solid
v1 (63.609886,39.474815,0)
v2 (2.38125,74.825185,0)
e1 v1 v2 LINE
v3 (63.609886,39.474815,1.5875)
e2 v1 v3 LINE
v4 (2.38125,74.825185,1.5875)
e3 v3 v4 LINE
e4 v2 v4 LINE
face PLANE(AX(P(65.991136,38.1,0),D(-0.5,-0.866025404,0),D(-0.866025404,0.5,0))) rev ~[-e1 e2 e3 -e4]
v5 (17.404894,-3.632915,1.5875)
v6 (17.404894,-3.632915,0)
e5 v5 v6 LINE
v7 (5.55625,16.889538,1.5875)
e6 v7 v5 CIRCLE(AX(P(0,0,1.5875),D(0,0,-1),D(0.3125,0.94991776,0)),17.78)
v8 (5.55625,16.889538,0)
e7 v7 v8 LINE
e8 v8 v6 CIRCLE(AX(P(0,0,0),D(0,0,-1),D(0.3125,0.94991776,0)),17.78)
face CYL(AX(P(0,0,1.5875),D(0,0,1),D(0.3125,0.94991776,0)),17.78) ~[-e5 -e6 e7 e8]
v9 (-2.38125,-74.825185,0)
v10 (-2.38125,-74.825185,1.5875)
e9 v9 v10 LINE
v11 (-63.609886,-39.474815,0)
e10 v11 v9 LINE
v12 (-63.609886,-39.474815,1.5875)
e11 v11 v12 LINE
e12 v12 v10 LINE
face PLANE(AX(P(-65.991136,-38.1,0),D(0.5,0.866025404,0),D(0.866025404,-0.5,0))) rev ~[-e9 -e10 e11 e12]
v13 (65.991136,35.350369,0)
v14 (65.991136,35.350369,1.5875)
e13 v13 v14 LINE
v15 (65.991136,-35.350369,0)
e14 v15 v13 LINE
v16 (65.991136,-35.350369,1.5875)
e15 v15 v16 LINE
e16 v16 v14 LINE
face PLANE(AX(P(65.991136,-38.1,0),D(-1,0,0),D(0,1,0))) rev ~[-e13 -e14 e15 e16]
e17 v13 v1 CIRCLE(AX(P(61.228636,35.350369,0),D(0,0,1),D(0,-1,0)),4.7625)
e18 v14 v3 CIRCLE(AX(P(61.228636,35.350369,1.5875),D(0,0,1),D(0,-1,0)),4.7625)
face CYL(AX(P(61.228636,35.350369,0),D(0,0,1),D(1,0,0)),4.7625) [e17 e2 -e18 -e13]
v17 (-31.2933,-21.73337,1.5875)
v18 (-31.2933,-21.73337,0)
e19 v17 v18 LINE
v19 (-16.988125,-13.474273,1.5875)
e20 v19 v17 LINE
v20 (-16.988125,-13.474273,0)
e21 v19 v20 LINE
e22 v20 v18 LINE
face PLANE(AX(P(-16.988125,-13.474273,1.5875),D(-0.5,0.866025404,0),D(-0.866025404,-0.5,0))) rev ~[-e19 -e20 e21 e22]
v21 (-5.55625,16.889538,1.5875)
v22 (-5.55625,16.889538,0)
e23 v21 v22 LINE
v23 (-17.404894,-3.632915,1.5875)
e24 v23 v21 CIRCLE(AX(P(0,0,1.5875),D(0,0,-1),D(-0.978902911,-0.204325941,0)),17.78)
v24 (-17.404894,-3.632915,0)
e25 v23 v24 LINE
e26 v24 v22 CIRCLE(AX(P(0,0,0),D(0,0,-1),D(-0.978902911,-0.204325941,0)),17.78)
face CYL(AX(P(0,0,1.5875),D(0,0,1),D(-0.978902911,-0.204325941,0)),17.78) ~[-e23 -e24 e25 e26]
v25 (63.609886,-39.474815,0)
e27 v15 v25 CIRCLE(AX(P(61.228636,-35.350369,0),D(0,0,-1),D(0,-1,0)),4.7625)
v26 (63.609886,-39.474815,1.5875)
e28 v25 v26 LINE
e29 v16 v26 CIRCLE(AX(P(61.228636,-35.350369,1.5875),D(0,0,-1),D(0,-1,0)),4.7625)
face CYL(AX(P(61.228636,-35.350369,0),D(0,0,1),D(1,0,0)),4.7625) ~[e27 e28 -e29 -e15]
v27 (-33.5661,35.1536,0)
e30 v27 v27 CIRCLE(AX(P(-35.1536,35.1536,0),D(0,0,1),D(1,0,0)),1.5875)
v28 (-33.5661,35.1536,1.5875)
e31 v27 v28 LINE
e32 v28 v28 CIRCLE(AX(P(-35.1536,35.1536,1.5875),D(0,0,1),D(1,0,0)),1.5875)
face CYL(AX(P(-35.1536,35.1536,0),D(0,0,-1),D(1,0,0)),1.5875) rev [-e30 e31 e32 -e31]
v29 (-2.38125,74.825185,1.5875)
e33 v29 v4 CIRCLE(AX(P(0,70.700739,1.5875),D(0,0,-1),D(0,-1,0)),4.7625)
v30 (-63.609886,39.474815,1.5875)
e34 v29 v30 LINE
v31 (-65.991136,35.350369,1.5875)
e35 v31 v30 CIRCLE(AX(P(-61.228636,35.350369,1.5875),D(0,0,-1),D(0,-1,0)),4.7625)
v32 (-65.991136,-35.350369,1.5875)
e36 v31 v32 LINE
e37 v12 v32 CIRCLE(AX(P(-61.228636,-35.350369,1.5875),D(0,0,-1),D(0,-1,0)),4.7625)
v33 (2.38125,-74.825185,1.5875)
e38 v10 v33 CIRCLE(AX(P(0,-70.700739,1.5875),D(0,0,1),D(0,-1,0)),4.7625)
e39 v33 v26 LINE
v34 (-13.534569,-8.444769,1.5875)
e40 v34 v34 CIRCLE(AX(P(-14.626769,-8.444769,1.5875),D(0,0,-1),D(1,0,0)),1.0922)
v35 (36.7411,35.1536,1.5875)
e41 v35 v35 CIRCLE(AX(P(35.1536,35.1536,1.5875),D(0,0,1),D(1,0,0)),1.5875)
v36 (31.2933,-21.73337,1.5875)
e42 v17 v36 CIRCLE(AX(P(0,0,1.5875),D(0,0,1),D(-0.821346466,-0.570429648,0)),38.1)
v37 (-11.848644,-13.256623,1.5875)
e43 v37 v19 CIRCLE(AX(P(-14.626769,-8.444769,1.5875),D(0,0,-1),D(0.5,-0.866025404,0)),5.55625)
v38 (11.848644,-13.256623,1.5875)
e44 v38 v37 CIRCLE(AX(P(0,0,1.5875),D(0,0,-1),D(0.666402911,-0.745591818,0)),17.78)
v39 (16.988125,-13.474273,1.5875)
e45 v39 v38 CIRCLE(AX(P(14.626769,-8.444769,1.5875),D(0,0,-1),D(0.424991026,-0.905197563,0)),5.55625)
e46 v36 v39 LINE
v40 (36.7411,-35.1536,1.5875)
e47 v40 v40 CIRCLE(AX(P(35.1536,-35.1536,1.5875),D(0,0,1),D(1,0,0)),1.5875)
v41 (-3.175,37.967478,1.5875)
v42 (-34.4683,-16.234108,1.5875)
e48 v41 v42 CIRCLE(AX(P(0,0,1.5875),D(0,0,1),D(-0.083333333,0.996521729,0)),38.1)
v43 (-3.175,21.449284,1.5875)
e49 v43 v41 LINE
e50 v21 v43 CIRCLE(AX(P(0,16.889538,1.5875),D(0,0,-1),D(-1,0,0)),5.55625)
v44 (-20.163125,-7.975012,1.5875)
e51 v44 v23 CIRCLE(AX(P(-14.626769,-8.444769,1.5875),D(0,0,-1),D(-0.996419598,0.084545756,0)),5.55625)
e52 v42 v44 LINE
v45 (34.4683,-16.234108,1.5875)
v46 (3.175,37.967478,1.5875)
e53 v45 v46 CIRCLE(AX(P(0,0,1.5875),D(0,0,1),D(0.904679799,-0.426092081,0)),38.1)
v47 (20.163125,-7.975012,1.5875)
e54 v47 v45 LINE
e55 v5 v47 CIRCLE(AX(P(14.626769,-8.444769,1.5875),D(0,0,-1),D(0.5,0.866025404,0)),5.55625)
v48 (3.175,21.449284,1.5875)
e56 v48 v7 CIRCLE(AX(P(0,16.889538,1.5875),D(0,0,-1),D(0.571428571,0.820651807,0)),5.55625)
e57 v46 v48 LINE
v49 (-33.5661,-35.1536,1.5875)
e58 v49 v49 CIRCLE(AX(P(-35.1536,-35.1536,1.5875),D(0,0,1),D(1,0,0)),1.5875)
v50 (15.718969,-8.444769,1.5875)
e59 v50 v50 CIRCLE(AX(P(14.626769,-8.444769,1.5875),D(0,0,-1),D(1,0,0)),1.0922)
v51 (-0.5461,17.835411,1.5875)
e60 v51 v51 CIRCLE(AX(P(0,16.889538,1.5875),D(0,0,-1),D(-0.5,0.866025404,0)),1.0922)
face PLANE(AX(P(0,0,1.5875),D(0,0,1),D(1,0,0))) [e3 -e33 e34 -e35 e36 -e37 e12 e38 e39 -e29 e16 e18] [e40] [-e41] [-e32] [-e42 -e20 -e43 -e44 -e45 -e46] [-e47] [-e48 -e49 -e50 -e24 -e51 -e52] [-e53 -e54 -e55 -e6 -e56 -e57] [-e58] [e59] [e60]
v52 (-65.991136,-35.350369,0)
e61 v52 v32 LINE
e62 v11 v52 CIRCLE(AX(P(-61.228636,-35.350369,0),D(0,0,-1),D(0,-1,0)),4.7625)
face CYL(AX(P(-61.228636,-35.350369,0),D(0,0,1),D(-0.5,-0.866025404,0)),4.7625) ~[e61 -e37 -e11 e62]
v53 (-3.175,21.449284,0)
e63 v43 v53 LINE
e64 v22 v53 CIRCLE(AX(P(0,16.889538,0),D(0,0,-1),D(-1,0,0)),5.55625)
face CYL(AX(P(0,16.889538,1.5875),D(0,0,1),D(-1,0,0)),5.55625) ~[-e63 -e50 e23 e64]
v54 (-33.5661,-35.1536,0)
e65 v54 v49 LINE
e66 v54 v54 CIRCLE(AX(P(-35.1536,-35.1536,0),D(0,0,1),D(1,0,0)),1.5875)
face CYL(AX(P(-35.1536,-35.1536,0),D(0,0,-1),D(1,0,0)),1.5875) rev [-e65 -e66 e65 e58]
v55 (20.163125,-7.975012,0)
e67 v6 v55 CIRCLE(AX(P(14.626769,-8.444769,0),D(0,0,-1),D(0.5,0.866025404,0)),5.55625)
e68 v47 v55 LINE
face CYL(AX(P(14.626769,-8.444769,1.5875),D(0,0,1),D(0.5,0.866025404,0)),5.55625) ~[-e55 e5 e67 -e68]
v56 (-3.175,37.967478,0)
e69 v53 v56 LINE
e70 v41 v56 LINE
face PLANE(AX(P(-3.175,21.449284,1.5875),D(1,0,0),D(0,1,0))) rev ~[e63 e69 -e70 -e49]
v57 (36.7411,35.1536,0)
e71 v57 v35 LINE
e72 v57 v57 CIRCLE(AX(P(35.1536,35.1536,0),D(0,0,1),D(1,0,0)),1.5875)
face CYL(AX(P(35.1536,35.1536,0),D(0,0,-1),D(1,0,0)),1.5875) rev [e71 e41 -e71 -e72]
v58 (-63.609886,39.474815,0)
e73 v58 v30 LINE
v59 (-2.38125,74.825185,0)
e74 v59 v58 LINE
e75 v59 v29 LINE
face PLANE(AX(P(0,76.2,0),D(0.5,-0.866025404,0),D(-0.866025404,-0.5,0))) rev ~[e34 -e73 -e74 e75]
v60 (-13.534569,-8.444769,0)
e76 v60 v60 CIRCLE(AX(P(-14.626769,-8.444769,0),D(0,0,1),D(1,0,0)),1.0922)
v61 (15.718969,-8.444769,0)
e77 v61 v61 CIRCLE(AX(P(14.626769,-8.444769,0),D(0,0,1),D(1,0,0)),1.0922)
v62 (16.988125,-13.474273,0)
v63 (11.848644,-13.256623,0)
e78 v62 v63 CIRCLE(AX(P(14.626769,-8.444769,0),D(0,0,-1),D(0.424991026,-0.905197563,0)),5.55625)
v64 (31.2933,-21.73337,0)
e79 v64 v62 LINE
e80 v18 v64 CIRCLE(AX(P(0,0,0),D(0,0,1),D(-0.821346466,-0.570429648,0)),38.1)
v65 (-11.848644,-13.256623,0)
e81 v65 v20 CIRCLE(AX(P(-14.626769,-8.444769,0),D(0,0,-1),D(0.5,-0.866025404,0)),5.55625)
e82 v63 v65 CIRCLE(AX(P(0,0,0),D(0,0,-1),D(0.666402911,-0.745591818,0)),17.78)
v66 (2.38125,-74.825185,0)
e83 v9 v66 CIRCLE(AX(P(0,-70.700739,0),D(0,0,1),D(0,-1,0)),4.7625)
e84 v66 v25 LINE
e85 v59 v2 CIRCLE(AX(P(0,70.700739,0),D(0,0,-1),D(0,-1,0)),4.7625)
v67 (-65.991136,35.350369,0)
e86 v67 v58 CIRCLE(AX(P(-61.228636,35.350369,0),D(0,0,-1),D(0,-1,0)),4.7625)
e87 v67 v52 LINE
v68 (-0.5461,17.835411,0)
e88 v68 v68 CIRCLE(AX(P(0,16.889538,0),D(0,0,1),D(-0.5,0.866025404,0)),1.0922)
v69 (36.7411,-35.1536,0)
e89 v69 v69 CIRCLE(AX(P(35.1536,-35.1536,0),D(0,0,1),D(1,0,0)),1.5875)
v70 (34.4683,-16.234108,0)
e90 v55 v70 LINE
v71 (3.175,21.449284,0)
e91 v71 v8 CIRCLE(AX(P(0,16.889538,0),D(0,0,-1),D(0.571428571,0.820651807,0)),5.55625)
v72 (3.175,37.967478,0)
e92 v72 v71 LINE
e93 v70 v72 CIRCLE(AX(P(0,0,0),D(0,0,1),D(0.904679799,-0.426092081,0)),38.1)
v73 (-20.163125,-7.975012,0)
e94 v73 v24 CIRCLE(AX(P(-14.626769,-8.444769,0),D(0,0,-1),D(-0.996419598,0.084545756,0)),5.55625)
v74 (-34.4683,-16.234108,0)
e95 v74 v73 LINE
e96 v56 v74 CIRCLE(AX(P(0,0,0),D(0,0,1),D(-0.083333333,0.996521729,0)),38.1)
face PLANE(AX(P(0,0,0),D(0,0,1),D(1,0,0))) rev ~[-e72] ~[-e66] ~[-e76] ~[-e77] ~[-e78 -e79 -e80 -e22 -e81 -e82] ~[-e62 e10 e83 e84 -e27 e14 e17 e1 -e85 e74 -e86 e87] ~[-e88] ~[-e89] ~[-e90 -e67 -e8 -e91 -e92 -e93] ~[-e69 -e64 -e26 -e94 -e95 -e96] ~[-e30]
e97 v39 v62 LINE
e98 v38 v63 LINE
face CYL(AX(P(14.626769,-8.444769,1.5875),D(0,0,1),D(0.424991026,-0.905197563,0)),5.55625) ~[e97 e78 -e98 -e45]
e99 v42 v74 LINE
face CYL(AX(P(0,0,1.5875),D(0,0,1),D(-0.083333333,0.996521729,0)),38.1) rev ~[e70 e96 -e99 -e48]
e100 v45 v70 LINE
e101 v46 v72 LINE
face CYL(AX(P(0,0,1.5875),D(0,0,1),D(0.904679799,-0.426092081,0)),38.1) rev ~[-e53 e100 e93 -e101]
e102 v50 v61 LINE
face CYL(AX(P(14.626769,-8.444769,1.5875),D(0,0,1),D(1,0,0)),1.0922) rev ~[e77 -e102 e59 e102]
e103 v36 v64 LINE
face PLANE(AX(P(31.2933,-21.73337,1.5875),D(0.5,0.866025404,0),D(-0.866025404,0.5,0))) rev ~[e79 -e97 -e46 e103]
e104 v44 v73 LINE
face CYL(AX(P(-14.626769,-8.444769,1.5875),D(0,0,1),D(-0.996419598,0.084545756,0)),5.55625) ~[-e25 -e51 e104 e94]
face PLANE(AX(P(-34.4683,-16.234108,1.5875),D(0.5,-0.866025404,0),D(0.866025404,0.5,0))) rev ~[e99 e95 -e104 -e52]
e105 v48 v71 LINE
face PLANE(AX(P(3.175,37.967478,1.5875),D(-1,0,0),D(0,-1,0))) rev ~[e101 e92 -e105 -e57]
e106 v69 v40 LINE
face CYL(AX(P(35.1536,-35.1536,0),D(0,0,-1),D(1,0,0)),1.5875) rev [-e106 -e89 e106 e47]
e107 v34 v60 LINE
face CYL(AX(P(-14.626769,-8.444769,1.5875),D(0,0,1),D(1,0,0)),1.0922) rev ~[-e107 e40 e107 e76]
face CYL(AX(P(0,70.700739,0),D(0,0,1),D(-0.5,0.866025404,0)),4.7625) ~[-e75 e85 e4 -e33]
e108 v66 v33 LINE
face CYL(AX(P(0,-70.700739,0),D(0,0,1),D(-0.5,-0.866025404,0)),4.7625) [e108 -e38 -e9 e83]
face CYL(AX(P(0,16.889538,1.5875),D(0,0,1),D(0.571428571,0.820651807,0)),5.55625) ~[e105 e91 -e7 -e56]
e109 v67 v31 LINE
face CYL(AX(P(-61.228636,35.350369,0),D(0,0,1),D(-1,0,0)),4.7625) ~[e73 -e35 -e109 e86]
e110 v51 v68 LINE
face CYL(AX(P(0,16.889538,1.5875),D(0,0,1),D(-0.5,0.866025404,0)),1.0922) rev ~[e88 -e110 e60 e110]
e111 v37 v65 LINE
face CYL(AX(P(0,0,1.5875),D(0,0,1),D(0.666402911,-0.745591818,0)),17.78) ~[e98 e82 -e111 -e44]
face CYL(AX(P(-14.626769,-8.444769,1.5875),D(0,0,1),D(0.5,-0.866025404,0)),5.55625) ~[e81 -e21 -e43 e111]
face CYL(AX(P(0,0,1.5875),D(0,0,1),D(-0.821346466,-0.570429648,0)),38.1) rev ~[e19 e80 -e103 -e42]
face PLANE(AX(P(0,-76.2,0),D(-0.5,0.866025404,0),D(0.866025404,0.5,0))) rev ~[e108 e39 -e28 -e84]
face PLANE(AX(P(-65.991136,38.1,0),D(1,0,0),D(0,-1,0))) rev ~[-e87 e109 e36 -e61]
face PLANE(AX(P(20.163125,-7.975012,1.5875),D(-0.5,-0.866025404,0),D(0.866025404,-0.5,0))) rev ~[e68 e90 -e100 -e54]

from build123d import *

# Parameters (mm, degrees)
F0_R            = 1.5875
F1_DEPTH        = 1.5875
F2_R            = 1.0922
F3_DEPTH        = 1.5875
F3_COPIES_COUNT = 3
F4_R            = 4.7625


# Not quite as in the source:
# - a pattern or mirror of a feature is missing from the dataset's text; its kind, count and spacing are read off the source's solid


with BuildPart() as f1:
    # F0 (on Top) → F1 (new body)
    with BuildSketch(Plane.XY):
        Polygon((65.9911357684, -38.1), (65.9911357684, 38.1), (0, 76.2), (-65.9911357684, 38.1), (-65.9911357684, -38.1), (0, -76.2), align=None)
        with Locations((-35.1536, -35.1536)):
            Circle(F0_R, mode=Mode.SUBTRACT)
        with Locations((35.1536, -35.1536)):
            Circle(F0_R, mode=Mode.SUBTRACT)
        with Locations((-35.1536, 35.1536)):
            Circle(F0_R, mode=Mode.SUBTRACT)
        with Locations((35.1536, 35.1536)):
            Circle(F0_R, mode=Mode.SUBTRACT)
    extrude(amount=F1_DEPTH)

    # F2 (on face) → F3 (cut, through all)
    with BuildSketch(Plane.XY.offset(1.5875)):
        with BuildLine():
            ThreePointArc((11.8486437632, -13.2566225326), (0, -17.78), (-11.8486437632, -13.2566225326))
            ThreePointArc((-11.8486437632, -13.2566225326), (-14.3916795622, -13.9960432527), (-16.9881251543, -13.4742728402))
            Line((-16.9881251543, -13.4742728402), (-31.2933003438, -21.7333695867))
            ThreePointArc((-31.2933003438, -21.7333695867), (0, -38.1), (31.2933003438, -21.7333695867))
            Line((31.2933003438, -21.7333695867), (16.9881251543, -13.4742728402))
            ThreePointArc((16.9881251543, -13.4742728402), (14.3916795622, -13.9960432527), (11.8486437632, -13.2566225326))
        make_face()
        with Locations((14.6267687632, -8.4447688828)):
            Circle(F2_R)
        with Locations((-14.6267687632, -8.4447688828)):
            Circle(F2_R)
    f3 = extrude(amount=-F3_DEPTH, mode=Mode.SUBTRACT)

    # F3_copies: F3 ×3 about axis
    f3_copies_axis = Axis((0, 0, 0), (0, 0, 1))
    for i in range(1, F3_COPIES_COUNT):
        add(f3.rotate(f3_copies_axis, i * 360 / F3_COPIES_COUNT), mode=Mode.SUBTRACT)

    # F4
    f4_edges = [f1.edges().sort_by_distance(p)[0] for p in [
        (-65.991136, 38.1, 0.79375),
        (0, 76.2, 0.79375),
        (65.991136, 38.1, 0.79375),
        (65.991136, -38.1, 0.79375),
        (0, -76.2, 0.79375),
        (-65.991136, -38.1, 0.79375),
    ]]
    fillet(f4_edges, radius=F4_R)


solid = f1.part
